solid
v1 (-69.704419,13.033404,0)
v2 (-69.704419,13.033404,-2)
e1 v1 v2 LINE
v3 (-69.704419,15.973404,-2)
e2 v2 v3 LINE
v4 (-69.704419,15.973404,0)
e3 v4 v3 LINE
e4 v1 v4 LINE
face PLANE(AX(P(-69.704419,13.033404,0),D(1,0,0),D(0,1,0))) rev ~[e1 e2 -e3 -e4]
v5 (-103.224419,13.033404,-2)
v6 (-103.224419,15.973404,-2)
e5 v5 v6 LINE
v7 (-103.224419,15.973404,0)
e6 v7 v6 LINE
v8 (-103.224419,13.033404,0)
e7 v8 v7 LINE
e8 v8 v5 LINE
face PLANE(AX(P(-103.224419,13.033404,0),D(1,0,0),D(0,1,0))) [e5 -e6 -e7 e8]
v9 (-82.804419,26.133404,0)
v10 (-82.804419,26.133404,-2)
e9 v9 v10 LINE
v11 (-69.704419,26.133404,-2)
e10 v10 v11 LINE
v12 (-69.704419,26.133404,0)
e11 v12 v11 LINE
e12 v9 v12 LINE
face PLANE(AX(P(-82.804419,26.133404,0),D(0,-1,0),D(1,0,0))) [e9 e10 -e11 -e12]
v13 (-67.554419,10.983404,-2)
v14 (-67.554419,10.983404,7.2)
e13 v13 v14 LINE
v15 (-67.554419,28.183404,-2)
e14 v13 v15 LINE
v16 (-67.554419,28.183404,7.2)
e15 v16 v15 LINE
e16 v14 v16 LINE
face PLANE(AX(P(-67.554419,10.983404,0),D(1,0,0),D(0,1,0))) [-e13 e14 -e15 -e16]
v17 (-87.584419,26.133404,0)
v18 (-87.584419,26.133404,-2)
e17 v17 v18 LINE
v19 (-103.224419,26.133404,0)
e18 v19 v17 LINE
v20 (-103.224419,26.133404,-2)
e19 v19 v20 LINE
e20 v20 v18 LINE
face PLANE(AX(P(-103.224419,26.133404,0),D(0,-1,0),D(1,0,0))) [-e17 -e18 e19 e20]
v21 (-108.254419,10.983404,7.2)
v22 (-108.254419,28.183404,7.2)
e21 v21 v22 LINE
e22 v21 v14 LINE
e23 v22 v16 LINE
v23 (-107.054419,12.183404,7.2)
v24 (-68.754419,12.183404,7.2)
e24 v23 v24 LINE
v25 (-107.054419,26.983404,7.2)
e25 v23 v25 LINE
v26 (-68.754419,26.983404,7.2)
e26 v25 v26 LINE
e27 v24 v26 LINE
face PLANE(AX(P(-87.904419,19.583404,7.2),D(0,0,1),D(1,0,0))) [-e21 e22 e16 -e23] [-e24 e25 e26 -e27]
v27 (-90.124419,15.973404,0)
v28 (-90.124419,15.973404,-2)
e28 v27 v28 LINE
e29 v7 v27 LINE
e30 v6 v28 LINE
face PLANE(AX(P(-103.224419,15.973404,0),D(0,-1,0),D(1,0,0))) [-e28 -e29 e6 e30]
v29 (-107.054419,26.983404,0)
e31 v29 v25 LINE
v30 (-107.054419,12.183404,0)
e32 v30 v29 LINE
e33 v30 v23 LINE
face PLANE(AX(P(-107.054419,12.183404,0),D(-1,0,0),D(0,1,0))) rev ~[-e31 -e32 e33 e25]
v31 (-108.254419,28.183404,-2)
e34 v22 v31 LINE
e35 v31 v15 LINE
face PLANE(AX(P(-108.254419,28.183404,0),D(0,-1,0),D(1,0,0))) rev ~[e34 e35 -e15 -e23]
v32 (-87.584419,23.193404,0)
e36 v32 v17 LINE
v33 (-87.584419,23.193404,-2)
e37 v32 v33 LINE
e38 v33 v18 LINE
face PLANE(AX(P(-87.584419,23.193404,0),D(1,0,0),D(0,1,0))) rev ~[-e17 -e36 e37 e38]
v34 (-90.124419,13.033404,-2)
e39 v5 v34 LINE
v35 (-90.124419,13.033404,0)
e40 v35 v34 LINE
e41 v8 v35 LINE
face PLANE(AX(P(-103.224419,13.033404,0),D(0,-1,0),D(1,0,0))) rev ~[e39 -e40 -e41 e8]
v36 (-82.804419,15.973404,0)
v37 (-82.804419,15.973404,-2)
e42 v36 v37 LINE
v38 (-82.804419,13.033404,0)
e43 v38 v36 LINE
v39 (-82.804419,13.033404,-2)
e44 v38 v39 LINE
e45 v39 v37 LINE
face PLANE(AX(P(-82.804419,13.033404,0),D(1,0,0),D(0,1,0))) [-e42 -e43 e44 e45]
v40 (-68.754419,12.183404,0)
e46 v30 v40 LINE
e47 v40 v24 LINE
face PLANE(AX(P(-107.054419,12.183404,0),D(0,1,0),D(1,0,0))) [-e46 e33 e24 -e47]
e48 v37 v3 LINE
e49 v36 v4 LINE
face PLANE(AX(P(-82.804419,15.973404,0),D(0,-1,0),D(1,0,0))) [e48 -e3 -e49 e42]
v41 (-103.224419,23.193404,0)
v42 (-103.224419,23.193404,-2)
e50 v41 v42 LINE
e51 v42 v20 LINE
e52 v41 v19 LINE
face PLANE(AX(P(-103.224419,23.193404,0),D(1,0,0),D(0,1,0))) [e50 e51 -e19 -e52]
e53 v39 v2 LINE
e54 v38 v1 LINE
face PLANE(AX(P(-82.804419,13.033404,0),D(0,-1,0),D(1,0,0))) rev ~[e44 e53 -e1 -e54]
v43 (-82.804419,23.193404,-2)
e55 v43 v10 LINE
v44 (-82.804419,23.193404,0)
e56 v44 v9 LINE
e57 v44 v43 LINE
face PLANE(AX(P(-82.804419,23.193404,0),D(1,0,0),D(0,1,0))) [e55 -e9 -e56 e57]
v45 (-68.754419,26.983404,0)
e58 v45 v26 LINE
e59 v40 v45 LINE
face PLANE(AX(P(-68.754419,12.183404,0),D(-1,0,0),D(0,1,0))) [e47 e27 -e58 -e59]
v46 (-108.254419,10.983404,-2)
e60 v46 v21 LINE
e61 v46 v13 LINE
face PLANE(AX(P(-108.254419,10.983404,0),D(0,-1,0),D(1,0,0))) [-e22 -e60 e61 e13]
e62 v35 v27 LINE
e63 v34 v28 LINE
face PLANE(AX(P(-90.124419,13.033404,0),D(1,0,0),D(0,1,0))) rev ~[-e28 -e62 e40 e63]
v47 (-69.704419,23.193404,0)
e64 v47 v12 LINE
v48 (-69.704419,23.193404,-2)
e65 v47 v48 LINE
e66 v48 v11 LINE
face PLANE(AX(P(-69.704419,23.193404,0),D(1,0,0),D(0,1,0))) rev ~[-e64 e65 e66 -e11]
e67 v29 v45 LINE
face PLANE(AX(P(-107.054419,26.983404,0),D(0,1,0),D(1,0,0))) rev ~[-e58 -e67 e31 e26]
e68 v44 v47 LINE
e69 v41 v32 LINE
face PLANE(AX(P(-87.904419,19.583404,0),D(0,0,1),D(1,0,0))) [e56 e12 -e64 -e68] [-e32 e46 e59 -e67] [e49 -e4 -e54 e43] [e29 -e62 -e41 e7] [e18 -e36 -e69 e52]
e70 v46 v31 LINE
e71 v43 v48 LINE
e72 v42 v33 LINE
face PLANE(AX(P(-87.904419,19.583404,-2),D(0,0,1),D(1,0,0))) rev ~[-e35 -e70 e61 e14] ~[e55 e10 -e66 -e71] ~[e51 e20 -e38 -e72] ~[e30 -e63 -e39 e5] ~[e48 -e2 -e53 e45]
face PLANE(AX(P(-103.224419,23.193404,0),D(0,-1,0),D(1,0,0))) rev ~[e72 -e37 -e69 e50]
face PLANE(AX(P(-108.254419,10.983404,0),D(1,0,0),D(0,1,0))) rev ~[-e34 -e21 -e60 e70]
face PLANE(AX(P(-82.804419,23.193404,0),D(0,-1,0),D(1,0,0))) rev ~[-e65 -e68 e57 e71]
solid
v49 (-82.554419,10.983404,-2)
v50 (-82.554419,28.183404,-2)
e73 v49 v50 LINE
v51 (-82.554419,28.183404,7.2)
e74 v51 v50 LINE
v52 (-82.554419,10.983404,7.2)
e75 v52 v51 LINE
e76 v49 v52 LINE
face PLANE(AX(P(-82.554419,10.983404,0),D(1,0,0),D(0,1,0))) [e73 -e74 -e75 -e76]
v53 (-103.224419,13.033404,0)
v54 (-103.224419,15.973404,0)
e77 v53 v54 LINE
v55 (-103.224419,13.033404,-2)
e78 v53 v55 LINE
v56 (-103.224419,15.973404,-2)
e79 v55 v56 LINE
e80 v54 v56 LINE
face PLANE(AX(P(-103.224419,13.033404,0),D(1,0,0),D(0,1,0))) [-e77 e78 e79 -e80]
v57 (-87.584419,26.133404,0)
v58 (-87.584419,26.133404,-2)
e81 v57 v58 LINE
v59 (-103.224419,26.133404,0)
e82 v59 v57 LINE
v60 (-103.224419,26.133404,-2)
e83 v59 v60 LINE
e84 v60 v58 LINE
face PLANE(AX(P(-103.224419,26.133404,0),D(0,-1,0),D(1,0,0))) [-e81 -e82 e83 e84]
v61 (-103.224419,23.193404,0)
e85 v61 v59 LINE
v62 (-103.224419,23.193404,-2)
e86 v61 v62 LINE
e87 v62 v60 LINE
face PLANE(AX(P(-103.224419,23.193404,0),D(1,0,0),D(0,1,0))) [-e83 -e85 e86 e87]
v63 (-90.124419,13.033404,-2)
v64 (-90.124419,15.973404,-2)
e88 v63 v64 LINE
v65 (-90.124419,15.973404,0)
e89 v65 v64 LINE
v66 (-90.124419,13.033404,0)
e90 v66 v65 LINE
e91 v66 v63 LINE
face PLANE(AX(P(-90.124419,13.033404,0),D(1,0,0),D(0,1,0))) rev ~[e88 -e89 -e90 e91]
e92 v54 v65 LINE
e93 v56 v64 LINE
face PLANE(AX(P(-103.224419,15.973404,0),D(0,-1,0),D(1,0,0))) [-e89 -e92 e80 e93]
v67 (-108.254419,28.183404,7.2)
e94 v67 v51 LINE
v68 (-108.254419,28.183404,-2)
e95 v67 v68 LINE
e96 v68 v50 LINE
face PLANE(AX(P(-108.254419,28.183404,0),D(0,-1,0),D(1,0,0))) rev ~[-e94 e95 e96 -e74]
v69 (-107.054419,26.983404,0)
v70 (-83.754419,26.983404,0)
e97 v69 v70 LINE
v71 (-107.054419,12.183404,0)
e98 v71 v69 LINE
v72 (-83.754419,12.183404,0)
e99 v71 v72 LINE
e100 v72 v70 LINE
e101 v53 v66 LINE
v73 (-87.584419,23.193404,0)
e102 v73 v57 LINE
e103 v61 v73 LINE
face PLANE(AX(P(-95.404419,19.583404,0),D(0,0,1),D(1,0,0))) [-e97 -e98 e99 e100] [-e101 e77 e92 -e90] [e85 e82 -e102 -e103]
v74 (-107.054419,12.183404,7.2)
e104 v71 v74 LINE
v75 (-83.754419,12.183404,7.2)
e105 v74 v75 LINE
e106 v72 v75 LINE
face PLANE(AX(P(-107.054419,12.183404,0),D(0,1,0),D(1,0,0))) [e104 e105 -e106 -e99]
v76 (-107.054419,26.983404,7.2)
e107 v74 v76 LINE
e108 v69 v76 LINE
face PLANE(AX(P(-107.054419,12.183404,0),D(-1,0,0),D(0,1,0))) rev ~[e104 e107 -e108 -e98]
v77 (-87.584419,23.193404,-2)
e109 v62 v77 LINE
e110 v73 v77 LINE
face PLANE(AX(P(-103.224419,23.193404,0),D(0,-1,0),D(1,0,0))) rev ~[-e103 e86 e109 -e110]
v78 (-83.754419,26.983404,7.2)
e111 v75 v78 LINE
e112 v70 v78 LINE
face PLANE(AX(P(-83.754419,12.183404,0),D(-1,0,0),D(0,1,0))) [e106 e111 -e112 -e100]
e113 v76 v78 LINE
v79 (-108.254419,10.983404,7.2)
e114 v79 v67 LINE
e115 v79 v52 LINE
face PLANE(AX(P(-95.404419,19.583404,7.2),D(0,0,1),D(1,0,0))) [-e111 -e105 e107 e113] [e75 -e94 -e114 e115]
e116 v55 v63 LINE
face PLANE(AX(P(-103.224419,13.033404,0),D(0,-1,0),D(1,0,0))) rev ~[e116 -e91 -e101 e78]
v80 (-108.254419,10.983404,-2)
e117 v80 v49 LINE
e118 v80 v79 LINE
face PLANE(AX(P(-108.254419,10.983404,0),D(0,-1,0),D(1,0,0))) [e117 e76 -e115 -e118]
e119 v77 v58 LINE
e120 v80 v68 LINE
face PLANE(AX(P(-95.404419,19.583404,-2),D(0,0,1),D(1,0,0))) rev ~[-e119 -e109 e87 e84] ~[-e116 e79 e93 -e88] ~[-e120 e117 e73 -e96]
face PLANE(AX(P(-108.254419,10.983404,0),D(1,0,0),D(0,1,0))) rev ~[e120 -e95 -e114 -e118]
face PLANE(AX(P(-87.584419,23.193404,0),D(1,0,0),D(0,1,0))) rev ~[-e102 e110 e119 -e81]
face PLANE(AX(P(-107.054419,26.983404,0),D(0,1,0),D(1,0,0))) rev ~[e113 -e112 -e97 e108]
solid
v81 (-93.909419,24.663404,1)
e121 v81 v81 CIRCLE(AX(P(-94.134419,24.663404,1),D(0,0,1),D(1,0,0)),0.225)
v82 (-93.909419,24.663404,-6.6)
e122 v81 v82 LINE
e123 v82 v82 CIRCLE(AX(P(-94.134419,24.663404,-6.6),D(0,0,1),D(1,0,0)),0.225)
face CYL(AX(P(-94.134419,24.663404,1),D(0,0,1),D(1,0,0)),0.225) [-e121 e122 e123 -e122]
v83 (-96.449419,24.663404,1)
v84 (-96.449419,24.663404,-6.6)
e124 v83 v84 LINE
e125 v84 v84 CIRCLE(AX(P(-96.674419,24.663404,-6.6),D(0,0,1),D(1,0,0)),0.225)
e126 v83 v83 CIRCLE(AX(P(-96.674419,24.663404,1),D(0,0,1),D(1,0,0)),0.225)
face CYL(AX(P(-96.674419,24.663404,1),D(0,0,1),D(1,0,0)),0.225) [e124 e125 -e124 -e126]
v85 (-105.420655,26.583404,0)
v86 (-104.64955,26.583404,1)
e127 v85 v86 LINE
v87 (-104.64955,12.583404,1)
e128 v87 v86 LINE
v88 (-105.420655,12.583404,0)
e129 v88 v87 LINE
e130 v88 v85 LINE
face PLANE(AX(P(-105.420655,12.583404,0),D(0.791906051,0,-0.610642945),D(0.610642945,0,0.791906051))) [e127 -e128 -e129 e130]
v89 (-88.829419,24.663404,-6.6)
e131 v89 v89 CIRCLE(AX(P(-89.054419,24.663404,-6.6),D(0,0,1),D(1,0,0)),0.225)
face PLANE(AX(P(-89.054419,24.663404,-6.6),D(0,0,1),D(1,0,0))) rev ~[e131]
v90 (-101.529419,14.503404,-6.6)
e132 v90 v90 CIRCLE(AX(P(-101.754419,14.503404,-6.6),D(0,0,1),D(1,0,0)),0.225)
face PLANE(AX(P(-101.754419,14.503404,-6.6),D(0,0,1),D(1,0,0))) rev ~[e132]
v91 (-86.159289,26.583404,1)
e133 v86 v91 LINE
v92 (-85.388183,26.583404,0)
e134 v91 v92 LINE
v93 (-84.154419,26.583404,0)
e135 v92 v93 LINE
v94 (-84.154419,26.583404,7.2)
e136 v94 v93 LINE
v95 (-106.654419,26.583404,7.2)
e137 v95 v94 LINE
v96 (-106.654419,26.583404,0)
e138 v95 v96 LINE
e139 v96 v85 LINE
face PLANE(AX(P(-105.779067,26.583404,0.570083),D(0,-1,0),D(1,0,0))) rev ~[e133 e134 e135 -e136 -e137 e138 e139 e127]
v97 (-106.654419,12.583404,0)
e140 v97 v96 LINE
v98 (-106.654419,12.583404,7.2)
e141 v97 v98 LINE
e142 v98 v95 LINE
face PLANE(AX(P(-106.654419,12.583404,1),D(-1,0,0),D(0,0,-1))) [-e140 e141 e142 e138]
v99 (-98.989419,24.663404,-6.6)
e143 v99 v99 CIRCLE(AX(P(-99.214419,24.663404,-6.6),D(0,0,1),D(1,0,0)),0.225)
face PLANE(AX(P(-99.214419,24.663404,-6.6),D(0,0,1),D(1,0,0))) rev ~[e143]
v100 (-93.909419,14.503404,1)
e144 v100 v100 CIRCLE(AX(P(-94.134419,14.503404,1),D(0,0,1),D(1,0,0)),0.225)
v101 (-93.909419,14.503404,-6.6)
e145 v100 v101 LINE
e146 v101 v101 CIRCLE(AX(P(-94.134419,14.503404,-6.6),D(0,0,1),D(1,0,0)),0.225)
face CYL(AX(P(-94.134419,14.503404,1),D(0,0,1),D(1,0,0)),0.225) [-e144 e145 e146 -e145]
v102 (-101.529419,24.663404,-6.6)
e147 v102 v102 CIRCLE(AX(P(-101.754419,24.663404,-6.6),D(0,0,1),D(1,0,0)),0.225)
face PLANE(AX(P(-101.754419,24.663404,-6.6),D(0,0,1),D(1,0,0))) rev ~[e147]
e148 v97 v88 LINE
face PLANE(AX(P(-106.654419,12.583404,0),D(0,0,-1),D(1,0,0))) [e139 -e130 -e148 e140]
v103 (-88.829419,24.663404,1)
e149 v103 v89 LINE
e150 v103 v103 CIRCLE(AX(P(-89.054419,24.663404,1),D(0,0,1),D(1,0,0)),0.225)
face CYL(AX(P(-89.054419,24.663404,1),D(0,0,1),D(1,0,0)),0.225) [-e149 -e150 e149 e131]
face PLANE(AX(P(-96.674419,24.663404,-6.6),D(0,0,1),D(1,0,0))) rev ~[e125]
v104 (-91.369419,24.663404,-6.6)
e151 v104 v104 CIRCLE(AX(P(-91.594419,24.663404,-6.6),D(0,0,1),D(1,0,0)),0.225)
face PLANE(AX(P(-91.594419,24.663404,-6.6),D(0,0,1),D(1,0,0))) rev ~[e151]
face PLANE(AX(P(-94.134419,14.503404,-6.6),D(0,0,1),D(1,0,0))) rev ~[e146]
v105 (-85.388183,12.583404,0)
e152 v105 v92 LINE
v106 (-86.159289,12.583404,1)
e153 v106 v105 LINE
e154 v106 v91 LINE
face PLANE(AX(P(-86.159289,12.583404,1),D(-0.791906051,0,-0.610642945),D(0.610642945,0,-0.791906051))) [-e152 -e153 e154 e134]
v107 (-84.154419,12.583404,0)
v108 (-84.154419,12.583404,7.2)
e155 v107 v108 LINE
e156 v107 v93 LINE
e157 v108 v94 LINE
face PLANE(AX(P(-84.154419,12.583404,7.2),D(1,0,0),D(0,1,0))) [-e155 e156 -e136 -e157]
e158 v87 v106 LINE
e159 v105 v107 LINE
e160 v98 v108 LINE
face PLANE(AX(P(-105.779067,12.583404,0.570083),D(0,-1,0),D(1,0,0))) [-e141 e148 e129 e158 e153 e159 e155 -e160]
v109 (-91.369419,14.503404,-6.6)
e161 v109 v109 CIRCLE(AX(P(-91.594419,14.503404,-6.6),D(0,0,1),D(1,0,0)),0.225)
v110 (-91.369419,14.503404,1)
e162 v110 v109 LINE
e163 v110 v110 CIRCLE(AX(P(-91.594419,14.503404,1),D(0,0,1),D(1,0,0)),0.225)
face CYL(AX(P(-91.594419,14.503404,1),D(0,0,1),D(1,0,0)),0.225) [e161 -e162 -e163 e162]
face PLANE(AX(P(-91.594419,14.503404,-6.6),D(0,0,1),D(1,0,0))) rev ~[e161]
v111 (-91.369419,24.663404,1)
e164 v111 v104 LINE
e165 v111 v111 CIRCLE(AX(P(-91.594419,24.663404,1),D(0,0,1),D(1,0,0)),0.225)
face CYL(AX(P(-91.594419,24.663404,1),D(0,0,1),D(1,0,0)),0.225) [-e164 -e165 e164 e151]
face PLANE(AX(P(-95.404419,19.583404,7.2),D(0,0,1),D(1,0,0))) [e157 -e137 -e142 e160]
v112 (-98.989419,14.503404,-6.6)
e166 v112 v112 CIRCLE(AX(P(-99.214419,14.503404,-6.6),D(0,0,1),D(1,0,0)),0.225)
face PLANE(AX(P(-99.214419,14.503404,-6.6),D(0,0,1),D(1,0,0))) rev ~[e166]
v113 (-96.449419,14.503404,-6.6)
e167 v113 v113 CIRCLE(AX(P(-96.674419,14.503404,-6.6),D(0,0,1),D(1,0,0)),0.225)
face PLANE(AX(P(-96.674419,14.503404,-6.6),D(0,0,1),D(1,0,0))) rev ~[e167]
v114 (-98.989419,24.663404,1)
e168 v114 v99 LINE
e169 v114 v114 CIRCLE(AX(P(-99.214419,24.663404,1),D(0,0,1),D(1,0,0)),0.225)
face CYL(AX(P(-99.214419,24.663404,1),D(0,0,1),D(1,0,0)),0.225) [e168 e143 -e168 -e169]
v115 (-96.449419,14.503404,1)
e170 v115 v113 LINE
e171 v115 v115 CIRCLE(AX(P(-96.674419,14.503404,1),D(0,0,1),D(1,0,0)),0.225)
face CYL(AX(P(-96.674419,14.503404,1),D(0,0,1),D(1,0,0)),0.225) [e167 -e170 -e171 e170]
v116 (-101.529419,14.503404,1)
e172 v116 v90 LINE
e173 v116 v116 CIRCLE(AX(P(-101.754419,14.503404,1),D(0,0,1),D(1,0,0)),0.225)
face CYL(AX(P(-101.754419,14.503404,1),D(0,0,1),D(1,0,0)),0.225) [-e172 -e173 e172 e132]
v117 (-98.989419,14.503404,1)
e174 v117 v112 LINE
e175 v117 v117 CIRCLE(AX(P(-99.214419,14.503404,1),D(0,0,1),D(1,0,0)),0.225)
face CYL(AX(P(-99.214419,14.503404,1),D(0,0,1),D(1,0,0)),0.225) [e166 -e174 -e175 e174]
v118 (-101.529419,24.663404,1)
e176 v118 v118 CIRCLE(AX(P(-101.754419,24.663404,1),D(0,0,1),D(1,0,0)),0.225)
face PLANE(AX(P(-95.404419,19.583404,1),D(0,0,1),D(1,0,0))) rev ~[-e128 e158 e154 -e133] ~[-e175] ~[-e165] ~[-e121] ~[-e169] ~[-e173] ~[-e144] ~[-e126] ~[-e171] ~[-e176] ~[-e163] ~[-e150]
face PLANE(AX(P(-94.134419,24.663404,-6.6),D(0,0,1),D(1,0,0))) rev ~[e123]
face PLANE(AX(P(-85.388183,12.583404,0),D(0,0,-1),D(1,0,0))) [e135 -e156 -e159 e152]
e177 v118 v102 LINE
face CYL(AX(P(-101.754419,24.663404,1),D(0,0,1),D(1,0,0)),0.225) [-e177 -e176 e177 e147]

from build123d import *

# Parameters (mm, degrees)
F4_W      = 22.5
F4_H      = 14
F6_DEPTH  = 6.2
F5_R      = 0.225
F7_DEPTH  = 7.6
F10_DEPTH = 14
F11_W     = 25.7
F11_H     = 17.2
F11_W_2   = 23.3
F11_H_2   = 14.8
F12_DEPTH = 7.2
F11_W_3   = 13.1
F11_H_3   = 2.94
F11_W_4   = 15.64
F13_DEPTH = 2
F14_W     = 40.7
F14_H     = 17.2
F14_W_2   = 38.3
F14_H_2   = 14.8
F15_DEPTH = 7.2
F14_W_3   = 13.1
F14_H_3   = 2.94
F14_W_4   = 15.64
F16_DEPTH = 2


# Not quite as in the source:
# - a feature names something its author has since deleted; it is built from what else it names


with BuildPart() as f6:
    # F4 (on offset) → F6 (new body, through all)
    with BuildSketch(Plane.XY.offset(7.2)):
        with Locations((-95.4044193358, 19.5834040642)):
            Rectangle(F4_W, F4_H)
    extrude(amount=-F6_DEPTH)

    # F5 (on offset) → F7 (join, through all)
    with BuildSketch(Plane.XY.offset(1)):
        with Locations((-91.5944193358, 24.6634040642)):
            Circle(F5_R)
        with Locations((-94.1344193358, 24.6634040642)):
            Circle(F5_R)
        with Locations((-96.6744193358, 24.6634040642)):
            Circle(F5_R)
        with Locations((-99.2144193358, 24.6634040642)):
            Circle(F5_R)
        with Locations((-101.7544193358, 24.6634040642)):
            Circle(F5_R)
        with Locations((-101.7544193358, 14.5034040642)):
            Circle(F5_R)
        with Locations((-99.2144193358, 14.5034040642)):
            Circle(F5_R)
        with Locations((-96.6744193358, 14.5034040642)):
            Circle(F5_R)
        with Locations((-94.1344193358, 14.5034040642)):
            Circle(F5_R)
        with Locations((-91.5944193358, 14.5034040642)):
            Circle(F5_R)
        with Locations((-89.0544193358, 24.6634040642)):
            Circle(F5_R)
    extrude(amount=-F7_DEPTH)

    # F9 (on offset) → F10 (join, through all)
    with BuildSketch(Plane.XZ.offset(-12.5834040642)):
        Polygon((-104.6495500536, 1), (-106.6544193358, 1), (-106.6544193358, 0), (-105.420655343, 0), align=None)
        Polygon((-86.1592886181, 1), (-85.3881833286, 0), (-84.1544193358, 0), (-84.1544193358, 1), align=None)
    extrude(amount=-F10_DEPTH)


with BuildPart() as f12:
    # F11 (on offset) → F12 (new body, through all)
    with BuildSketch(Plane.XY):
        with Locations((-95.4044193358, 19.5834040642)):
            Rectangle(F11_W, F11_H)
        with Locations((-95.4044193358, 19.5834040642)):
            Rectangle(F11_W_2, F11_H_2, mode=Mode.SUBTRACT)
    extrude(amount=F12_DEPTH)

    # F11 (on offset) → F13 (join)
    with BuildSketch(Plane.XY):
        with Locations((-95.4044193358, 19.5834040642)):
            Rectangle(F11_W, F11_H)
        with Locations((-95.4044193358, 19.5834040642)):
            Rectangle(F11_W_2, F11_H_2, mode=Mode.SUBTRACT)
        with Locations((-95.4044193358, 19.5834040642)):
            Rectangle(F11_W_2, F11_H_2)
        with Locations((-96.6744193358, 14.5034040642)):
            Rectangle(F11_W_3, F11_H_3, mode=Mode.SUBTRACT)
        with Locations((-95.4044193358, 24.6634040642)):
            Rectangle(F11_W_4, F11_H_3, mode=Mode.SUBTRACT)
    extrude(amount=-F13_DEPTH)


with BuildPart() as f15:
    # F14 (on offset) → F15 (new body, through all)
    with BuildSketch(Plane.XY):
        with Locations((-87.9044193358, 19.5834040642)):
            Rectangle(F14_W, F14_H)
        with Locations((-87.9044193358, 19.5834040642)):
            Rectangle(F14_W_2, F14_H_2, mode=Mode.SUBTRACT)
    extrude(amount=F15_DEPTH)

    # F14 (on offset) → F16 (join)
    with BuildSketch(Plane.XY):
        with Locations((-87.9044193358, 19.5834040642)):
            Rectangle(F14_W, F14_H)
        with Locations((-87.9044193358, 19.5834040642)):
            Rectangle(F14_W_2, F14_H_2, mode=Mode.SUBTRACT)
        with Locations((-87.9044193358, 19.5834040642)):
            Rectangle(F14_W_2, F14_H_2)
        with Locations((-96.6744193358, 14.5034040642)):
            Rectangle(F14_W_3, F14_H_3, mode=Mode.SUBTRACT)
        with Locations((-76.2544193358, 14.5034040642)):
            Rectangle(F14_W_3, F14_H_3, mode=Mode.SUBTRACT)
        with Locations((-95.4044193358, 24.6634040642)):
            Rectangle(F14_W_4, F14_H_3, mode=Mode.SUBTRACT)
        with Locations((-76.2544193358, 24.6634040642)):
            Rectangle(F14_W_3, F14_H_3, mode=Mode.SUBTRACT)
    extrude(amount=-F16_DEPTH)


solid = Compound([f6.part, f12.part, f15.part])
